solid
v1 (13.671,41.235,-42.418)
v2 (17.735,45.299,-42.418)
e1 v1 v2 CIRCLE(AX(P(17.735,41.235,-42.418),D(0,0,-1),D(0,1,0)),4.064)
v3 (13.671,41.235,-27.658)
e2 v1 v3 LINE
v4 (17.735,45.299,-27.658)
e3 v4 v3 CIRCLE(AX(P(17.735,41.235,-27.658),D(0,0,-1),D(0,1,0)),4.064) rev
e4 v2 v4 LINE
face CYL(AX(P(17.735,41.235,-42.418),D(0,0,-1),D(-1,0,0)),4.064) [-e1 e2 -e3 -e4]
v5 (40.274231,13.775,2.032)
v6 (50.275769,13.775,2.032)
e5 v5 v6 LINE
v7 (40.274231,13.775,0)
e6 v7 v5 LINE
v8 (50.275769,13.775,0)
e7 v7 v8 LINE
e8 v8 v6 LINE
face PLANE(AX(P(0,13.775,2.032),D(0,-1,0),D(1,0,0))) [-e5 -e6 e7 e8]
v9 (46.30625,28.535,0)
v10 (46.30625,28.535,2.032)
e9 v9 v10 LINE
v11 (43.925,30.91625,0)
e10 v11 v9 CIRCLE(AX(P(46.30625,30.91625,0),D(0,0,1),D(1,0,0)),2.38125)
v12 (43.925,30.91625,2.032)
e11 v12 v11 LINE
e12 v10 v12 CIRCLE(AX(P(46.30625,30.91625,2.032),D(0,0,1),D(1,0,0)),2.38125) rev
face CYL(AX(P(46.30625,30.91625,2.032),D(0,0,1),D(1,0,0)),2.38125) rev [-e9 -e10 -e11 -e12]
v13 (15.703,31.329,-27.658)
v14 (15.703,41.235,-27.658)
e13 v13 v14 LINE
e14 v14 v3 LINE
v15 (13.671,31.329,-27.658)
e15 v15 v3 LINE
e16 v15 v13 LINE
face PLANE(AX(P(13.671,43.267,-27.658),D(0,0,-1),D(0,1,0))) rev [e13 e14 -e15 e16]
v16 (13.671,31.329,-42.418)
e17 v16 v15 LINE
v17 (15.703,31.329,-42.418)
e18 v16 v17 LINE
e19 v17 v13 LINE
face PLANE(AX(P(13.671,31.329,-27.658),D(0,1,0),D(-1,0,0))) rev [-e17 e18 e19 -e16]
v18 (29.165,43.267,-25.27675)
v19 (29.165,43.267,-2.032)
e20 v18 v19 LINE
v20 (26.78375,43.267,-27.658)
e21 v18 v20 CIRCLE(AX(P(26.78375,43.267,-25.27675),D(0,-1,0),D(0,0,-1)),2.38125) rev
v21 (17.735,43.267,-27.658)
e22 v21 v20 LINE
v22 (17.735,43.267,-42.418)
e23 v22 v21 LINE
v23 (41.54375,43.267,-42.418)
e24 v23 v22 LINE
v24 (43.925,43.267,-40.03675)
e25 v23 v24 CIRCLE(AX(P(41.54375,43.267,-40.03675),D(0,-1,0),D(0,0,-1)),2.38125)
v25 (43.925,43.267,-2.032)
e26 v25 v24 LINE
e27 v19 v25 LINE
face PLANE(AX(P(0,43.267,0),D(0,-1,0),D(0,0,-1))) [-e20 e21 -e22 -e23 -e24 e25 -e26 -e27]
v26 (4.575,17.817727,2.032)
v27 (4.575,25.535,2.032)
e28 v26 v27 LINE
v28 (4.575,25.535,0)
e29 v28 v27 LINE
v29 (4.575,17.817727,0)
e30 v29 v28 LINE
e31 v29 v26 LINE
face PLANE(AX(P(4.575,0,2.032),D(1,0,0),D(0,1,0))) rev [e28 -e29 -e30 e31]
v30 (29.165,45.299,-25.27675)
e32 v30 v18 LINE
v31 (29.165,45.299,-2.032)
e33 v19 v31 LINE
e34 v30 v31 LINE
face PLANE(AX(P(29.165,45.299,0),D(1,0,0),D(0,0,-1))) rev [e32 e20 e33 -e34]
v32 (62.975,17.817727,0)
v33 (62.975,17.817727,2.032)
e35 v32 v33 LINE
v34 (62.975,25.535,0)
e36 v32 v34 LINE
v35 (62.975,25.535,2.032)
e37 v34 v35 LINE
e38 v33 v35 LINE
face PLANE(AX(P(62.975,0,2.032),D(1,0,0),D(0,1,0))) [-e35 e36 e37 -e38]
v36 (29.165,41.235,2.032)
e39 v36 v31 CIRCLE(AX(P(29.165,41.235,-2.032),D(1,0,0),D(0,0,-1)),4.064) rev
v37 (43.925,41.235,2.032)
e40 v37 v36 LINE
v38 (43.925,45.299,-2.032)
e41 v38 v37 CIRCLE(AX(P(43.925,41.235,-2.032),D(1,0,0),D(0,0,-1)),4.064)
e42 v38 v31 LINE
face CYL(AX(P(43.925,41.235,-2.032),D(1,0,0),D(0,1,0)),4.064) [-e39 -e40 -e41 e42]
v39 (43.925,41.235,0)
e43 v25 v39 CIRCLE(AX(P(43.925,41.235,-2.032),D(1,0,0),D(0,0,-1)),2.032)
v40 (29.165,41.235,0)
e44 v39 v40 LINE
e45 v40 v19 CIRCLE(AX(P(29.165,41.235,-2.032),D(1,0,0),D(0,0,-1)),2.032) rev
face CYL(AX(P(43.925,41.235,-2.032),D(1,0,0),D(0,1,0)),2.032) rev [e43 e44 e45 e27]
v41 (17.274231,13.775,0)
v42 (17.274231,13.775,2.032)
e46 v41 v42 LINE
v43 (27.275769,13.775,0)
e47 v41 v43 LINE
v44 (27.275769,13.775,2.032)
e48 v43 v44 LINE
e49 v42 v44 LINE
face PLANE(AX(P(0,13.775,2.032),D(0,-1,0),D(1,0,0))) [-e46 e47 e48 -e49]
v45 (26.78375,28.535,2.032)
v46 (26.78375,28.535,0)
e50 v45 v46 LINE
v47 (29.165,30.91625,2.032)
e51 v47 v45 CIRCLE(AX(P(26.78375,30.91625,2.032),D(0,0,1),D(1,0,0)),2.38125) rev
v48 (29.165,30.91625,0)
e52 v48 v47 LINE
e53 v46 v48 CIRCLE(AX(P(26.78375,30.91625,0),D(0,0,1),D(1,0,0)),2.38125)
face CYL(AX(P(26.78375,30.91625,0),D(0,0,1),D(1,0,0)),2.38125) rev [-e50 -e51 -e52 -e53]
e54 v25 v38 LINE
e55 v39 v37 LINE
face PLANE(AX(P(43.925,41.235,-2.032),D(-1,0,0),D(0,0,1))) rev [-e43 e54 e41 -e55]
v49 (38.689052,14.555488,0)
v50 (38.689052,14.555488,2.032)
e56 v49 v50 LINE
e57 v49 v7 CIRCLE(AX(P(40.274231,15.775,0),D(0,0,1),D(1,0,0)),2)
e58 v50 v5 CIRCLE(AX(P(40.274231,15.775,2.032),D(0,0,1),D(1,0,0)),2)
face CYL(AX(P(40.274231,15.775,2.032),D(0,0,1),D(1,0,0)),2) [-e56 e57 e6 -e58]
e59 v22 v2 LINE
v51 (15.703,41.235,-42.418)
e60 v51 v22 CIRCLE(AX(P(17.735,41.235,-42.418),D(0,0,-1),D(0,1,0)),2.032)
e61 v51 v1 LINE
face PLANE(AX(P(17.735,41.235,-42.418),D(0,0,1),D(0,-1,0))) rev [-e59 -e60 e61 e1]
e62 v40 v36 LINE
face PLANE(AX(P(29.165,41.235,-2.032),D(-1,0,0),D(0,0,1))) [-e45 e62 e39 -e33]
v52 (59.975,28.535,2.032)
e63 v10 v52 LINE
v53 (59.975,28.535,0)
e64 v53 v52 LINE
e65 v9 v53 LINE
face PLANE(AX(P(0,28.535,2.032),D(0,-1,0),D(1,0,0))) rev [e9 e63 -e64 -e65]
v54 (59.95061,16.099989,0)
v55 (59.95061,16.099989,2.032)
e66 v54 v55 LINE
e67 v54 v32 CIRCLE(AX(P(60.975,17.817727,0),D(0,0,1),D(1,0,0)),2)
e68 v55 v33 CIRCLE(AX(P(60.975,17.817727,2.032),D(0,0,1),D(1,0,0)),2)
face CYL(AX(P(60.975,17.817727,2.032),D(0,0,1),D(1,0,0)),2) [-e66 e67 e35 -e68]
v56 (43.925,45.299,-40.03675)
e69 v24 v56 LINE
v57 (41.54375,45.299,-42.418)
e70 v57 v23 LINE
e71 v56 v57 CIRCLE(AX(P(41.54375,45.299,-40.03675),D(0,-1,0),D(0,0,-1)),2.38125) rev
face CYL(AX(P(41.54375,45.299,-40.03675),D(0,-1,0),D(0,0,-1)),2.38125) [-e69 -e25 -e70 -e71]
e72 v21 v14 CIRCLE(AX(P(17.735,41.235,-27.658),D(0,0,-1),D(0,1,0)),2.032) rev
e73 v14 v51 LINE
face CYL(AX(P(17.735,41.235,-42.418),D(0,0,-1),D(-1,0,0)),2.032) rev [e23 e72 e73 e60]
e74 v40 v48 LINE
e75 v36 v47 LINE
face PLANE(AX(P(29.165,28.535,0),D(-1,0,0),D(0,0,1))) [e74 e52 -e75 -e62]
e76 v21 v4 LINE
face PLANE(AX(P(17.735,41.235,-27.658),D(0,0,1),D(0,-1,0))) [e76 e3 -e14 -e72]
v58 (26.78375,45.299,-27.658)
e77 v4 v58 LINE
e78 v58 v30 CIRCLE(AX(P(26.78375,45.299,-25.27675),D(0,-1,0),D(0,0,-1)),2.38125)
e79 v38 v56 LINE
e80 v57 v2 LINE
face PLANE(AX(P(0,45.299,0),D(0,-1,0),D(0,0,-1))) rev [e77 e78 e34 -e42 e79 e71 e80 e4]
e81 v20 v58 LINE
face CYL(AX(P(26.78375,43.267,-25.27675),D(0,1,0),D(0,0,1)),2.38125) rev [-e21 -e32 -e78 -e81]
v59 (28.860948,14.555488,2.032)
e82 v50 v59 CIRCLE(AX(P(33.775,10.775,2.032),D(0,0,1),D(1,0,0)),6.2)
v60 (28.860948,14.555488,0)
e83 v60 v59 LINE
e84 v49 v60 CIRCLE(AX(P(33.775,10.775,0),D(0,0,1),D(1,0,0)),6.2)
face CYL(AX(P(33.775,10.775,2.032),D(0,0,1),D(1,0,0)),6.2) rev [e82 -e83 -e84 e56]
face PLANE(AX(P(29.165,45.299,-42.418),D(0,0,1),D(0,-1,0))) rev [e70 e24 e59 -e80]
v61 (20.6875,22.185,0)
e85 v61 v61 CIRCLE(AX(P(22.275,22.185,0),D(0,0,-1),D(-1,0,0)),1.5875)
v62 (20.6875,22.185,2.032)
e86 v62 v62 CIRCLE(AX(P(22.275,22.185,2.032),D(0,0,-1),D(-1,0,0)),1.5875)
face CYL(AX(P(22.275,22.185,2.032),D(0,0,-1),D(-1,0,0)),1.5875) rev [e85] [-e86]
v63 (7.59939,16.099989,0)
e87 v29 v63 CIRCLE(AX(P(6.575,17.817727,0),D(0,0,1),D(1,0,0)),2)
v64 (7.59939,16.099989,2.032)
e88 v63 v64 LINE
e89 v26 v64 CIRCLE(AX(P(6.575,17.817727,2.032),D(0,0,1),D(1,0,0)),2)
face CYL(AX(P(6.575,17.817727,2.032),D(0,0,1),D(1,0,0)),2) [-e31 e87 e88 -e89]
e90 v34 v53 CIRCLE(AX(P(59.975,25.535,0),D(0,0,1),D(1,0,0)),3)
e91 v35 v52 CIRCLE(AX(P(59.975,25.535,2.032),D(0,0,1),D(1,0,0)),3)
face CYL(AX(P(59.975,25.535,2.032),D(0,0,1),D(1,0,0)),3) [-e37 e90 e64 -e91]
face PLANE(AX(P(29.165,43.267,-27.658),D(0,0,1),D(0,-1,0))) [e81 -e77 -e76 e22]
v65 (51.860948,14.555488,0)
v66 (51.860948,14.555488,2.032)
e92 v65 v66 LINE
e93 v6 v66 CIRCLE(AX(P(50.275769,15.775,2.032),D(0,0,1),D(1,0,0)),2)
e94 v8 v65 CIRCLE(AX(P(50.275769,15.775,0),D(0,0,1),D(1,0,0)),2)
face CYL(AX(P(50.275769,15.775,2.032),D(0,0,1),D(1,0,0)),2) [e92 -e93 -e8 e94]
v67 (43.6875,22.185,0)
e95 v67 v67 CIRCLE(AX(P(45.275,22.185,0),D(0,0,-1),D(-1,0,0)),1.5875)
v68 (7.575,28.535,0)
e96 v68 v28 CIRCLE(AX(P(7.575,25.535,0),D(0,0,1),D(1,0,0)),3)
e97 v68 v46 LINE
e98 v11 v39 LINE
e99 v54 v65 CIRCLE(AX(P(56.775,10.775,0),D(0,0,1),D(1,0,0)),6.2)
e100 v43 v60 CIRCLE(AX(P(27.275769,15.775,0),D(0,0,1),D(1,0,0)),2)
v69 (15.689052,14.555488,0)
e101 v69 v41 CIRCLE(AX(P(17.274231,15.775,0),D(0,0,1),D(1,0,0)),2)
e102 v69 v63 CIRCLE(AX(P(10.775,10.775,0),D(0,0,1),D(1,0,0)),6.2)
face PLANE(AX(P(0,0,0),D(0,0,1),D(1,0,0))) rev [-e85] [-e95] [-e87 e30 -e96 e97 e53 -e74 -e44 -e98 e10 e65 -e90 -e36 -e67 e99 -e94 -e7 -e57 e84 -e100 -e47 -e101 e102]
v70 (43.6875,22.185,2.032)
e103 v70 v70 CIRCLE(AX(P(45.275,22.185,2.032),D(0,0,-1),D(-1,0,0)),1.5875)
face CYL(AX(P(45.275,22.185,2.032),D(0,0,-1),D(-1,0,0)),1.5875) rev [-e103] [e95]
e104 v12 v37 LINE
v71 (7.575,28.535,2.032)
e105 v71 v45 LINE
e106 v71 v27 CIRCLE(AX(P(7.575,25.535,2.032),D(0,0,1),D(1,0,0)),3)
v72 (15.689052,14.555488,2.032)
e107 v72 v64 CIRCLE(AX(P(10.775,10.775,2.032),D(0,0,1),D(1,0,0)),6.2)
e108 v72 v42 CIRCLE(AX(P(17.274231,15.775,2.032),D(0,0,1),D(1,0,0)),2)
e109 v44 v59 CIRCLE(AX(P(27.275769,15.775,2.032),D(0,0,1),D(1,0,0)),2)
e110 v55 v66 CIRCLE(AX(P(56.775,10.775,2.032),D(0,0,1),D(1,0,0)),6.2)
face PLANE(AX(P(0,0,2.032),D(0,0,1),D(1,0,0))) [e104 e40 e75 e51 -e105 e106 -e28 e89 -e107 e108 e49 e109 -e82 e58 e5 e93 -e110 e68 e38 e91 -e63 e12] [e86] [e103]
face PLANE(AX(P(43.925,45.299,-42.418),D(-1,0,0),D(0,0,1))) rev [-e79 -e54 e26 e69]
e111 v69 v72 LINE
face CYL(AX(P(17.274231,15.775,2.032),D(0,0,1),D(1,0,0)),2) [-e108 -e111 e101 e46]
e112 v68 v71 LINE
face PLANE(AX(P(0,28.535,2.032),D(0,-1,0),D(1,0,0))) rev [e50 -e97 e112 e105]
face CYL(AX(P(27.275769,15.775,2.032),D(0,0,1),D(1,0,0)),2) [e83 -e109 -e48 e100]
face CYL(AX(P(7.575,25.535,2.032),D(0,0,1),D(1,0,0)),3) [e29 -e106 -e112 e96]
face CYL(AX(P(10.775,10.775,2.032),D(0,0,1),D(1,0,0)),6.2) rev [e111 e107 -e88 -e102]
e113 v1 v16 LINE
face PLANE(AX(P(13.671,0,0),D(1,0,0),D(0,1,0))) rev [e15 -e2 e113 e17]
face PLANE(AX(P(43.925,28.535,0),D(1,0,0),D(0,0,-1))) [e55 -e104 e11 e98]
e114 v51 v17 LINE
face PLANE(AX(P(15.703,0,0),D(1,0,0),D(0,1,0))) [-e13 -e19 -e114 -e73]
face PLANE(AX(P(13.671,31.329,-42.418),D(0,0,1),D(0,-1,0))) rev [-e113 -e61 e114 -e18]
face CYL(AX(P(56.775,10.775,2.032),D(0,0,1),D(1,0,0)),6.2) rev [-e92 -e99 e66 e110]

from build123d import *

# Parameters (mm, degrees)
BOSS_EXTRUDE1_DEPTH = 2.032
FILLET1_R           = 3
FILLET2_R           = 2
SKETCH14_R          = 1.5874999999999986
CUT_EXTRUDE1_DEPTH  = 70.16809880796494
SKETCH15_W          = 14.760000000000002
SKETCH15_H          = 12.699999999999996
BOSS_EXTRUDE4_DEPTH = 2.032
EDGE_FLANGE3_DEPTH  = 14.760000000000002
BOSS_EXTRUDE5_DEPTH = 2.032
EDGE_FLANGE4_DEPTH  = 14.760000000000002
FILLET4_R           = 2.38125


# Sheet-metal steps are written as plain solids
with BuildPart() as part:
    # Sketch3 → Boss-Extrude1 (new body)
    with BuildSketch(Plane.XY):
        with BuildLine():
            ThreePointArc((4.574999999999999, 10.775), (9.225864227432316, 16.77834726283189), (16.200863986500366, 13.774999999999732))
            Line((16.20086398650046, 13.774999999999999), (28.34913601349985, 13.774999999999999))
            ThreePointArc((28.349136013499827, 13.775000000000073), (33.77500000000019, 16.974999999999998), (39.20086398650036, 13.77499999999973))
            Line((39.20086398650045, 13.774999999999999), (51.34913601349986, 13.774999999999999))
            ThreePointArc((51.34913601349983, 13.775000000000077), (58.32413577256787, 16.778347262831836), (62.974999999999994, 10.775000000000002))
            Line((62.974999999999994, 10.775), (62.975, 28.534999999999997))
            Line((62.97500000000001, 28.534999999999997), (4.574999999999999, 28.534999999999997))
            Line((4.574999999999999, 28.534999999999997), (4.574999999999999, 10.774999999999999))
        make_face()
    extrude(amount=BOSS_EXTRUDE1_DEPTH)

    # Fillet1
    fillet1_edges = [part.edges().sort_by_distance(p)[0] for p in [
        (4.574999999999999, 28.534999999999997, 1.016),
        (62.97500000000001, 28.534999999999997, 1.016),
    ]]
    fillet(fillet1_edges, radius=FILLET1_R)

    # Fillet2
    fillet2_edges = [part.edges().sort_by_distance(p)[0] for p in [
        (62.974999999999994, 10.775000000000002, 1.016),
    ]]
    fillet(fillet2_edges, radius=FILLET2_R)
    fillet2_2_edges = [part.edges().sort_by_distance(p)[0] for p in [
        (51.349136013499844, 13.775000000000038, 1.016),
    ]]
    fillet(fillet2_2_edges, radius=FILLET2_R)
    fillet2_3_edges = [part.edges().sort_by_distance(p)[0] for p in [
        (39.20086398650041, 13.774999999999864, 1.016),
    ]]
    fillet(fillet2_3_edges, radius=FILLET2_R)
    fillet2_4_edges = [part.edges().sort_by_distance(p)[0] for p in [
        (28.349136013499837, 13.775000000000036, 1.016),
    ]]
    fillet(fillet2_4_edges, radius=FILLET2_R)
    fillet2_5_edges = [part.edges().sort_by_distance(p)[0] for p in [
        (4.574999999999999, 10.774999999999999, 1.016),
    ]]
    fillet(fillet2_5_edges, radius=FILLET2_R)
    fillet2_6_edges = [part.edges().sort_by_distance(p)[0] for p in [
        (16.200863986500412, 13.774999999999865, 1.016),
    ]]
    fillet(fillet2_6_edges, radius=FILLET2_R)

    # Sketch14 → Cut-Extrude1 (cut, through all)
    with BuildSketch(Plane(origin=(0, 0, 0), x_dir=(-1, 0, 0), z_dir=(0, 0, -1))):
        with Locations((-45.275, 22.184999999999995)):
            Circle(SKETCH14_R)
        with Locations((-22.275000000000002, 22.184999999999995)):
            Circle(SKETCH14_R)
    extrude(amount=-CUT_EXTRUDE1_DEPTH, mode=Mode.SUBTRACT)

    # Sketch15 → Boss-Extrude4 (add)
    with BuildSketch(Plane.XY.offset(2.032)):
        with Locations((36.545, 34.88499999999999)):
            Rectangle(SKETCH15_W, SKETCH15_H)
    extrude(amount=-BOSS_EXTRUDE4_DEPTH)

    # Edge-Flange3 section (across the edge) → Edge-Flange3 (add)
    with BuildSketch(Plane(origin=(29.165000000000003, 43.266999999999996, 1.419e-14), x_dir=(0, -1, -3.49e-15), z_dir=(1, 0, 0))):
        with BuildLine():
            Line((-2.032, 2.032000000000007), (-2.032, 42.418000000000006))
            Line((-2.032, 42.418000000000006), (0, 42.418000000000006))
            Line((0, 42.418000000000006), (0, 2.032000000000007))
            ThreePointArc((0, 2.032000000000007), (0.5951590206289381, 0.5951590206289399), (2.032000000000007, 7.11e-15))
            Line((2.032000000000007, 7.11e-15), (2.0320000000000142, -2.031999999999993))
            ThreePointArc((2.0320000000000142, -2.031999999999993), (-0.8416819587421238, -0.8416819587421274), (-2.032, 2.032000000000007))
        make_face()
    extrude(amount=EDGE_FLANGE3_DEPTH)

    # Sketch19 → Boss-Extrude5 (add)
    with BuildSketch(Plane(origin=(0, 45.298999999999985, 1.5561e-13), x_dir=(1, 0, 0), z_dir=(0, 1, 3.44e-15))):
        Polygon((29.165000000000003, 42.41800000000015), (17.735000000000003, 42.41800000000015), (17.73500000000001, 27.658000000000147), (29.165000000000006, 27.658000000000147), align=None)
    extrude(amount=-BOSS_EXTRUDE5_DEPTH)

    # Edge-Flange4 section (across the edge) → Edge-Flange4 (add)
    with BuildSketch(Plane(origin=(15.703000000000005, 43.2670000000001, -27.657999999999998), x_dir=(1, -3.49e-15, -4.7e-16), z_dir=(-4.7e-16, 3.29e-15, -1))):
        with BuildLine():
            Line((-2.032, 2.032000000000007), (-2.032, 11.93800000000001))
            Line((-2.032, 11.93800000000001), (0, 11.93800000000001))
            Line((0, 11.93800000000001), (0, 2.032000000000007))
            ThreePointArc((0, 2.032000000000007), (0.5951590206289381, 0.5951590206289399), (2.032000000000007, 7.11e-15))
            Line((2.032000000000007, 7.11e-15), (2.0320000000000142, -2.031999999999993))
            ThreePointArc((2.0320000000000142, -2.031999999999993), (-0.8416819587421238, -0.8416819587421274), (-2.032, 2.032000000000007))
        make_face()
    extrude(amount=EDGE_FLANGE4_DEPTH)

    # Fillet4
    fillet4_edges = [part.edges().sort_by_distance(p)[0] for p in [
        (29.165000000000006, 44.28300000000008, -27.657999999999994),
        (29.165000000000003, 28.534999999999997, 1.016),
        (43.925000000000004, 28.534999999999997, 1.016),
        (43.925000000000004, 44.28300000000014, -42.41799999999999),
    ]]
    fillet(fillet4_edges, radius=FILLET4_R)


solid = part.part
